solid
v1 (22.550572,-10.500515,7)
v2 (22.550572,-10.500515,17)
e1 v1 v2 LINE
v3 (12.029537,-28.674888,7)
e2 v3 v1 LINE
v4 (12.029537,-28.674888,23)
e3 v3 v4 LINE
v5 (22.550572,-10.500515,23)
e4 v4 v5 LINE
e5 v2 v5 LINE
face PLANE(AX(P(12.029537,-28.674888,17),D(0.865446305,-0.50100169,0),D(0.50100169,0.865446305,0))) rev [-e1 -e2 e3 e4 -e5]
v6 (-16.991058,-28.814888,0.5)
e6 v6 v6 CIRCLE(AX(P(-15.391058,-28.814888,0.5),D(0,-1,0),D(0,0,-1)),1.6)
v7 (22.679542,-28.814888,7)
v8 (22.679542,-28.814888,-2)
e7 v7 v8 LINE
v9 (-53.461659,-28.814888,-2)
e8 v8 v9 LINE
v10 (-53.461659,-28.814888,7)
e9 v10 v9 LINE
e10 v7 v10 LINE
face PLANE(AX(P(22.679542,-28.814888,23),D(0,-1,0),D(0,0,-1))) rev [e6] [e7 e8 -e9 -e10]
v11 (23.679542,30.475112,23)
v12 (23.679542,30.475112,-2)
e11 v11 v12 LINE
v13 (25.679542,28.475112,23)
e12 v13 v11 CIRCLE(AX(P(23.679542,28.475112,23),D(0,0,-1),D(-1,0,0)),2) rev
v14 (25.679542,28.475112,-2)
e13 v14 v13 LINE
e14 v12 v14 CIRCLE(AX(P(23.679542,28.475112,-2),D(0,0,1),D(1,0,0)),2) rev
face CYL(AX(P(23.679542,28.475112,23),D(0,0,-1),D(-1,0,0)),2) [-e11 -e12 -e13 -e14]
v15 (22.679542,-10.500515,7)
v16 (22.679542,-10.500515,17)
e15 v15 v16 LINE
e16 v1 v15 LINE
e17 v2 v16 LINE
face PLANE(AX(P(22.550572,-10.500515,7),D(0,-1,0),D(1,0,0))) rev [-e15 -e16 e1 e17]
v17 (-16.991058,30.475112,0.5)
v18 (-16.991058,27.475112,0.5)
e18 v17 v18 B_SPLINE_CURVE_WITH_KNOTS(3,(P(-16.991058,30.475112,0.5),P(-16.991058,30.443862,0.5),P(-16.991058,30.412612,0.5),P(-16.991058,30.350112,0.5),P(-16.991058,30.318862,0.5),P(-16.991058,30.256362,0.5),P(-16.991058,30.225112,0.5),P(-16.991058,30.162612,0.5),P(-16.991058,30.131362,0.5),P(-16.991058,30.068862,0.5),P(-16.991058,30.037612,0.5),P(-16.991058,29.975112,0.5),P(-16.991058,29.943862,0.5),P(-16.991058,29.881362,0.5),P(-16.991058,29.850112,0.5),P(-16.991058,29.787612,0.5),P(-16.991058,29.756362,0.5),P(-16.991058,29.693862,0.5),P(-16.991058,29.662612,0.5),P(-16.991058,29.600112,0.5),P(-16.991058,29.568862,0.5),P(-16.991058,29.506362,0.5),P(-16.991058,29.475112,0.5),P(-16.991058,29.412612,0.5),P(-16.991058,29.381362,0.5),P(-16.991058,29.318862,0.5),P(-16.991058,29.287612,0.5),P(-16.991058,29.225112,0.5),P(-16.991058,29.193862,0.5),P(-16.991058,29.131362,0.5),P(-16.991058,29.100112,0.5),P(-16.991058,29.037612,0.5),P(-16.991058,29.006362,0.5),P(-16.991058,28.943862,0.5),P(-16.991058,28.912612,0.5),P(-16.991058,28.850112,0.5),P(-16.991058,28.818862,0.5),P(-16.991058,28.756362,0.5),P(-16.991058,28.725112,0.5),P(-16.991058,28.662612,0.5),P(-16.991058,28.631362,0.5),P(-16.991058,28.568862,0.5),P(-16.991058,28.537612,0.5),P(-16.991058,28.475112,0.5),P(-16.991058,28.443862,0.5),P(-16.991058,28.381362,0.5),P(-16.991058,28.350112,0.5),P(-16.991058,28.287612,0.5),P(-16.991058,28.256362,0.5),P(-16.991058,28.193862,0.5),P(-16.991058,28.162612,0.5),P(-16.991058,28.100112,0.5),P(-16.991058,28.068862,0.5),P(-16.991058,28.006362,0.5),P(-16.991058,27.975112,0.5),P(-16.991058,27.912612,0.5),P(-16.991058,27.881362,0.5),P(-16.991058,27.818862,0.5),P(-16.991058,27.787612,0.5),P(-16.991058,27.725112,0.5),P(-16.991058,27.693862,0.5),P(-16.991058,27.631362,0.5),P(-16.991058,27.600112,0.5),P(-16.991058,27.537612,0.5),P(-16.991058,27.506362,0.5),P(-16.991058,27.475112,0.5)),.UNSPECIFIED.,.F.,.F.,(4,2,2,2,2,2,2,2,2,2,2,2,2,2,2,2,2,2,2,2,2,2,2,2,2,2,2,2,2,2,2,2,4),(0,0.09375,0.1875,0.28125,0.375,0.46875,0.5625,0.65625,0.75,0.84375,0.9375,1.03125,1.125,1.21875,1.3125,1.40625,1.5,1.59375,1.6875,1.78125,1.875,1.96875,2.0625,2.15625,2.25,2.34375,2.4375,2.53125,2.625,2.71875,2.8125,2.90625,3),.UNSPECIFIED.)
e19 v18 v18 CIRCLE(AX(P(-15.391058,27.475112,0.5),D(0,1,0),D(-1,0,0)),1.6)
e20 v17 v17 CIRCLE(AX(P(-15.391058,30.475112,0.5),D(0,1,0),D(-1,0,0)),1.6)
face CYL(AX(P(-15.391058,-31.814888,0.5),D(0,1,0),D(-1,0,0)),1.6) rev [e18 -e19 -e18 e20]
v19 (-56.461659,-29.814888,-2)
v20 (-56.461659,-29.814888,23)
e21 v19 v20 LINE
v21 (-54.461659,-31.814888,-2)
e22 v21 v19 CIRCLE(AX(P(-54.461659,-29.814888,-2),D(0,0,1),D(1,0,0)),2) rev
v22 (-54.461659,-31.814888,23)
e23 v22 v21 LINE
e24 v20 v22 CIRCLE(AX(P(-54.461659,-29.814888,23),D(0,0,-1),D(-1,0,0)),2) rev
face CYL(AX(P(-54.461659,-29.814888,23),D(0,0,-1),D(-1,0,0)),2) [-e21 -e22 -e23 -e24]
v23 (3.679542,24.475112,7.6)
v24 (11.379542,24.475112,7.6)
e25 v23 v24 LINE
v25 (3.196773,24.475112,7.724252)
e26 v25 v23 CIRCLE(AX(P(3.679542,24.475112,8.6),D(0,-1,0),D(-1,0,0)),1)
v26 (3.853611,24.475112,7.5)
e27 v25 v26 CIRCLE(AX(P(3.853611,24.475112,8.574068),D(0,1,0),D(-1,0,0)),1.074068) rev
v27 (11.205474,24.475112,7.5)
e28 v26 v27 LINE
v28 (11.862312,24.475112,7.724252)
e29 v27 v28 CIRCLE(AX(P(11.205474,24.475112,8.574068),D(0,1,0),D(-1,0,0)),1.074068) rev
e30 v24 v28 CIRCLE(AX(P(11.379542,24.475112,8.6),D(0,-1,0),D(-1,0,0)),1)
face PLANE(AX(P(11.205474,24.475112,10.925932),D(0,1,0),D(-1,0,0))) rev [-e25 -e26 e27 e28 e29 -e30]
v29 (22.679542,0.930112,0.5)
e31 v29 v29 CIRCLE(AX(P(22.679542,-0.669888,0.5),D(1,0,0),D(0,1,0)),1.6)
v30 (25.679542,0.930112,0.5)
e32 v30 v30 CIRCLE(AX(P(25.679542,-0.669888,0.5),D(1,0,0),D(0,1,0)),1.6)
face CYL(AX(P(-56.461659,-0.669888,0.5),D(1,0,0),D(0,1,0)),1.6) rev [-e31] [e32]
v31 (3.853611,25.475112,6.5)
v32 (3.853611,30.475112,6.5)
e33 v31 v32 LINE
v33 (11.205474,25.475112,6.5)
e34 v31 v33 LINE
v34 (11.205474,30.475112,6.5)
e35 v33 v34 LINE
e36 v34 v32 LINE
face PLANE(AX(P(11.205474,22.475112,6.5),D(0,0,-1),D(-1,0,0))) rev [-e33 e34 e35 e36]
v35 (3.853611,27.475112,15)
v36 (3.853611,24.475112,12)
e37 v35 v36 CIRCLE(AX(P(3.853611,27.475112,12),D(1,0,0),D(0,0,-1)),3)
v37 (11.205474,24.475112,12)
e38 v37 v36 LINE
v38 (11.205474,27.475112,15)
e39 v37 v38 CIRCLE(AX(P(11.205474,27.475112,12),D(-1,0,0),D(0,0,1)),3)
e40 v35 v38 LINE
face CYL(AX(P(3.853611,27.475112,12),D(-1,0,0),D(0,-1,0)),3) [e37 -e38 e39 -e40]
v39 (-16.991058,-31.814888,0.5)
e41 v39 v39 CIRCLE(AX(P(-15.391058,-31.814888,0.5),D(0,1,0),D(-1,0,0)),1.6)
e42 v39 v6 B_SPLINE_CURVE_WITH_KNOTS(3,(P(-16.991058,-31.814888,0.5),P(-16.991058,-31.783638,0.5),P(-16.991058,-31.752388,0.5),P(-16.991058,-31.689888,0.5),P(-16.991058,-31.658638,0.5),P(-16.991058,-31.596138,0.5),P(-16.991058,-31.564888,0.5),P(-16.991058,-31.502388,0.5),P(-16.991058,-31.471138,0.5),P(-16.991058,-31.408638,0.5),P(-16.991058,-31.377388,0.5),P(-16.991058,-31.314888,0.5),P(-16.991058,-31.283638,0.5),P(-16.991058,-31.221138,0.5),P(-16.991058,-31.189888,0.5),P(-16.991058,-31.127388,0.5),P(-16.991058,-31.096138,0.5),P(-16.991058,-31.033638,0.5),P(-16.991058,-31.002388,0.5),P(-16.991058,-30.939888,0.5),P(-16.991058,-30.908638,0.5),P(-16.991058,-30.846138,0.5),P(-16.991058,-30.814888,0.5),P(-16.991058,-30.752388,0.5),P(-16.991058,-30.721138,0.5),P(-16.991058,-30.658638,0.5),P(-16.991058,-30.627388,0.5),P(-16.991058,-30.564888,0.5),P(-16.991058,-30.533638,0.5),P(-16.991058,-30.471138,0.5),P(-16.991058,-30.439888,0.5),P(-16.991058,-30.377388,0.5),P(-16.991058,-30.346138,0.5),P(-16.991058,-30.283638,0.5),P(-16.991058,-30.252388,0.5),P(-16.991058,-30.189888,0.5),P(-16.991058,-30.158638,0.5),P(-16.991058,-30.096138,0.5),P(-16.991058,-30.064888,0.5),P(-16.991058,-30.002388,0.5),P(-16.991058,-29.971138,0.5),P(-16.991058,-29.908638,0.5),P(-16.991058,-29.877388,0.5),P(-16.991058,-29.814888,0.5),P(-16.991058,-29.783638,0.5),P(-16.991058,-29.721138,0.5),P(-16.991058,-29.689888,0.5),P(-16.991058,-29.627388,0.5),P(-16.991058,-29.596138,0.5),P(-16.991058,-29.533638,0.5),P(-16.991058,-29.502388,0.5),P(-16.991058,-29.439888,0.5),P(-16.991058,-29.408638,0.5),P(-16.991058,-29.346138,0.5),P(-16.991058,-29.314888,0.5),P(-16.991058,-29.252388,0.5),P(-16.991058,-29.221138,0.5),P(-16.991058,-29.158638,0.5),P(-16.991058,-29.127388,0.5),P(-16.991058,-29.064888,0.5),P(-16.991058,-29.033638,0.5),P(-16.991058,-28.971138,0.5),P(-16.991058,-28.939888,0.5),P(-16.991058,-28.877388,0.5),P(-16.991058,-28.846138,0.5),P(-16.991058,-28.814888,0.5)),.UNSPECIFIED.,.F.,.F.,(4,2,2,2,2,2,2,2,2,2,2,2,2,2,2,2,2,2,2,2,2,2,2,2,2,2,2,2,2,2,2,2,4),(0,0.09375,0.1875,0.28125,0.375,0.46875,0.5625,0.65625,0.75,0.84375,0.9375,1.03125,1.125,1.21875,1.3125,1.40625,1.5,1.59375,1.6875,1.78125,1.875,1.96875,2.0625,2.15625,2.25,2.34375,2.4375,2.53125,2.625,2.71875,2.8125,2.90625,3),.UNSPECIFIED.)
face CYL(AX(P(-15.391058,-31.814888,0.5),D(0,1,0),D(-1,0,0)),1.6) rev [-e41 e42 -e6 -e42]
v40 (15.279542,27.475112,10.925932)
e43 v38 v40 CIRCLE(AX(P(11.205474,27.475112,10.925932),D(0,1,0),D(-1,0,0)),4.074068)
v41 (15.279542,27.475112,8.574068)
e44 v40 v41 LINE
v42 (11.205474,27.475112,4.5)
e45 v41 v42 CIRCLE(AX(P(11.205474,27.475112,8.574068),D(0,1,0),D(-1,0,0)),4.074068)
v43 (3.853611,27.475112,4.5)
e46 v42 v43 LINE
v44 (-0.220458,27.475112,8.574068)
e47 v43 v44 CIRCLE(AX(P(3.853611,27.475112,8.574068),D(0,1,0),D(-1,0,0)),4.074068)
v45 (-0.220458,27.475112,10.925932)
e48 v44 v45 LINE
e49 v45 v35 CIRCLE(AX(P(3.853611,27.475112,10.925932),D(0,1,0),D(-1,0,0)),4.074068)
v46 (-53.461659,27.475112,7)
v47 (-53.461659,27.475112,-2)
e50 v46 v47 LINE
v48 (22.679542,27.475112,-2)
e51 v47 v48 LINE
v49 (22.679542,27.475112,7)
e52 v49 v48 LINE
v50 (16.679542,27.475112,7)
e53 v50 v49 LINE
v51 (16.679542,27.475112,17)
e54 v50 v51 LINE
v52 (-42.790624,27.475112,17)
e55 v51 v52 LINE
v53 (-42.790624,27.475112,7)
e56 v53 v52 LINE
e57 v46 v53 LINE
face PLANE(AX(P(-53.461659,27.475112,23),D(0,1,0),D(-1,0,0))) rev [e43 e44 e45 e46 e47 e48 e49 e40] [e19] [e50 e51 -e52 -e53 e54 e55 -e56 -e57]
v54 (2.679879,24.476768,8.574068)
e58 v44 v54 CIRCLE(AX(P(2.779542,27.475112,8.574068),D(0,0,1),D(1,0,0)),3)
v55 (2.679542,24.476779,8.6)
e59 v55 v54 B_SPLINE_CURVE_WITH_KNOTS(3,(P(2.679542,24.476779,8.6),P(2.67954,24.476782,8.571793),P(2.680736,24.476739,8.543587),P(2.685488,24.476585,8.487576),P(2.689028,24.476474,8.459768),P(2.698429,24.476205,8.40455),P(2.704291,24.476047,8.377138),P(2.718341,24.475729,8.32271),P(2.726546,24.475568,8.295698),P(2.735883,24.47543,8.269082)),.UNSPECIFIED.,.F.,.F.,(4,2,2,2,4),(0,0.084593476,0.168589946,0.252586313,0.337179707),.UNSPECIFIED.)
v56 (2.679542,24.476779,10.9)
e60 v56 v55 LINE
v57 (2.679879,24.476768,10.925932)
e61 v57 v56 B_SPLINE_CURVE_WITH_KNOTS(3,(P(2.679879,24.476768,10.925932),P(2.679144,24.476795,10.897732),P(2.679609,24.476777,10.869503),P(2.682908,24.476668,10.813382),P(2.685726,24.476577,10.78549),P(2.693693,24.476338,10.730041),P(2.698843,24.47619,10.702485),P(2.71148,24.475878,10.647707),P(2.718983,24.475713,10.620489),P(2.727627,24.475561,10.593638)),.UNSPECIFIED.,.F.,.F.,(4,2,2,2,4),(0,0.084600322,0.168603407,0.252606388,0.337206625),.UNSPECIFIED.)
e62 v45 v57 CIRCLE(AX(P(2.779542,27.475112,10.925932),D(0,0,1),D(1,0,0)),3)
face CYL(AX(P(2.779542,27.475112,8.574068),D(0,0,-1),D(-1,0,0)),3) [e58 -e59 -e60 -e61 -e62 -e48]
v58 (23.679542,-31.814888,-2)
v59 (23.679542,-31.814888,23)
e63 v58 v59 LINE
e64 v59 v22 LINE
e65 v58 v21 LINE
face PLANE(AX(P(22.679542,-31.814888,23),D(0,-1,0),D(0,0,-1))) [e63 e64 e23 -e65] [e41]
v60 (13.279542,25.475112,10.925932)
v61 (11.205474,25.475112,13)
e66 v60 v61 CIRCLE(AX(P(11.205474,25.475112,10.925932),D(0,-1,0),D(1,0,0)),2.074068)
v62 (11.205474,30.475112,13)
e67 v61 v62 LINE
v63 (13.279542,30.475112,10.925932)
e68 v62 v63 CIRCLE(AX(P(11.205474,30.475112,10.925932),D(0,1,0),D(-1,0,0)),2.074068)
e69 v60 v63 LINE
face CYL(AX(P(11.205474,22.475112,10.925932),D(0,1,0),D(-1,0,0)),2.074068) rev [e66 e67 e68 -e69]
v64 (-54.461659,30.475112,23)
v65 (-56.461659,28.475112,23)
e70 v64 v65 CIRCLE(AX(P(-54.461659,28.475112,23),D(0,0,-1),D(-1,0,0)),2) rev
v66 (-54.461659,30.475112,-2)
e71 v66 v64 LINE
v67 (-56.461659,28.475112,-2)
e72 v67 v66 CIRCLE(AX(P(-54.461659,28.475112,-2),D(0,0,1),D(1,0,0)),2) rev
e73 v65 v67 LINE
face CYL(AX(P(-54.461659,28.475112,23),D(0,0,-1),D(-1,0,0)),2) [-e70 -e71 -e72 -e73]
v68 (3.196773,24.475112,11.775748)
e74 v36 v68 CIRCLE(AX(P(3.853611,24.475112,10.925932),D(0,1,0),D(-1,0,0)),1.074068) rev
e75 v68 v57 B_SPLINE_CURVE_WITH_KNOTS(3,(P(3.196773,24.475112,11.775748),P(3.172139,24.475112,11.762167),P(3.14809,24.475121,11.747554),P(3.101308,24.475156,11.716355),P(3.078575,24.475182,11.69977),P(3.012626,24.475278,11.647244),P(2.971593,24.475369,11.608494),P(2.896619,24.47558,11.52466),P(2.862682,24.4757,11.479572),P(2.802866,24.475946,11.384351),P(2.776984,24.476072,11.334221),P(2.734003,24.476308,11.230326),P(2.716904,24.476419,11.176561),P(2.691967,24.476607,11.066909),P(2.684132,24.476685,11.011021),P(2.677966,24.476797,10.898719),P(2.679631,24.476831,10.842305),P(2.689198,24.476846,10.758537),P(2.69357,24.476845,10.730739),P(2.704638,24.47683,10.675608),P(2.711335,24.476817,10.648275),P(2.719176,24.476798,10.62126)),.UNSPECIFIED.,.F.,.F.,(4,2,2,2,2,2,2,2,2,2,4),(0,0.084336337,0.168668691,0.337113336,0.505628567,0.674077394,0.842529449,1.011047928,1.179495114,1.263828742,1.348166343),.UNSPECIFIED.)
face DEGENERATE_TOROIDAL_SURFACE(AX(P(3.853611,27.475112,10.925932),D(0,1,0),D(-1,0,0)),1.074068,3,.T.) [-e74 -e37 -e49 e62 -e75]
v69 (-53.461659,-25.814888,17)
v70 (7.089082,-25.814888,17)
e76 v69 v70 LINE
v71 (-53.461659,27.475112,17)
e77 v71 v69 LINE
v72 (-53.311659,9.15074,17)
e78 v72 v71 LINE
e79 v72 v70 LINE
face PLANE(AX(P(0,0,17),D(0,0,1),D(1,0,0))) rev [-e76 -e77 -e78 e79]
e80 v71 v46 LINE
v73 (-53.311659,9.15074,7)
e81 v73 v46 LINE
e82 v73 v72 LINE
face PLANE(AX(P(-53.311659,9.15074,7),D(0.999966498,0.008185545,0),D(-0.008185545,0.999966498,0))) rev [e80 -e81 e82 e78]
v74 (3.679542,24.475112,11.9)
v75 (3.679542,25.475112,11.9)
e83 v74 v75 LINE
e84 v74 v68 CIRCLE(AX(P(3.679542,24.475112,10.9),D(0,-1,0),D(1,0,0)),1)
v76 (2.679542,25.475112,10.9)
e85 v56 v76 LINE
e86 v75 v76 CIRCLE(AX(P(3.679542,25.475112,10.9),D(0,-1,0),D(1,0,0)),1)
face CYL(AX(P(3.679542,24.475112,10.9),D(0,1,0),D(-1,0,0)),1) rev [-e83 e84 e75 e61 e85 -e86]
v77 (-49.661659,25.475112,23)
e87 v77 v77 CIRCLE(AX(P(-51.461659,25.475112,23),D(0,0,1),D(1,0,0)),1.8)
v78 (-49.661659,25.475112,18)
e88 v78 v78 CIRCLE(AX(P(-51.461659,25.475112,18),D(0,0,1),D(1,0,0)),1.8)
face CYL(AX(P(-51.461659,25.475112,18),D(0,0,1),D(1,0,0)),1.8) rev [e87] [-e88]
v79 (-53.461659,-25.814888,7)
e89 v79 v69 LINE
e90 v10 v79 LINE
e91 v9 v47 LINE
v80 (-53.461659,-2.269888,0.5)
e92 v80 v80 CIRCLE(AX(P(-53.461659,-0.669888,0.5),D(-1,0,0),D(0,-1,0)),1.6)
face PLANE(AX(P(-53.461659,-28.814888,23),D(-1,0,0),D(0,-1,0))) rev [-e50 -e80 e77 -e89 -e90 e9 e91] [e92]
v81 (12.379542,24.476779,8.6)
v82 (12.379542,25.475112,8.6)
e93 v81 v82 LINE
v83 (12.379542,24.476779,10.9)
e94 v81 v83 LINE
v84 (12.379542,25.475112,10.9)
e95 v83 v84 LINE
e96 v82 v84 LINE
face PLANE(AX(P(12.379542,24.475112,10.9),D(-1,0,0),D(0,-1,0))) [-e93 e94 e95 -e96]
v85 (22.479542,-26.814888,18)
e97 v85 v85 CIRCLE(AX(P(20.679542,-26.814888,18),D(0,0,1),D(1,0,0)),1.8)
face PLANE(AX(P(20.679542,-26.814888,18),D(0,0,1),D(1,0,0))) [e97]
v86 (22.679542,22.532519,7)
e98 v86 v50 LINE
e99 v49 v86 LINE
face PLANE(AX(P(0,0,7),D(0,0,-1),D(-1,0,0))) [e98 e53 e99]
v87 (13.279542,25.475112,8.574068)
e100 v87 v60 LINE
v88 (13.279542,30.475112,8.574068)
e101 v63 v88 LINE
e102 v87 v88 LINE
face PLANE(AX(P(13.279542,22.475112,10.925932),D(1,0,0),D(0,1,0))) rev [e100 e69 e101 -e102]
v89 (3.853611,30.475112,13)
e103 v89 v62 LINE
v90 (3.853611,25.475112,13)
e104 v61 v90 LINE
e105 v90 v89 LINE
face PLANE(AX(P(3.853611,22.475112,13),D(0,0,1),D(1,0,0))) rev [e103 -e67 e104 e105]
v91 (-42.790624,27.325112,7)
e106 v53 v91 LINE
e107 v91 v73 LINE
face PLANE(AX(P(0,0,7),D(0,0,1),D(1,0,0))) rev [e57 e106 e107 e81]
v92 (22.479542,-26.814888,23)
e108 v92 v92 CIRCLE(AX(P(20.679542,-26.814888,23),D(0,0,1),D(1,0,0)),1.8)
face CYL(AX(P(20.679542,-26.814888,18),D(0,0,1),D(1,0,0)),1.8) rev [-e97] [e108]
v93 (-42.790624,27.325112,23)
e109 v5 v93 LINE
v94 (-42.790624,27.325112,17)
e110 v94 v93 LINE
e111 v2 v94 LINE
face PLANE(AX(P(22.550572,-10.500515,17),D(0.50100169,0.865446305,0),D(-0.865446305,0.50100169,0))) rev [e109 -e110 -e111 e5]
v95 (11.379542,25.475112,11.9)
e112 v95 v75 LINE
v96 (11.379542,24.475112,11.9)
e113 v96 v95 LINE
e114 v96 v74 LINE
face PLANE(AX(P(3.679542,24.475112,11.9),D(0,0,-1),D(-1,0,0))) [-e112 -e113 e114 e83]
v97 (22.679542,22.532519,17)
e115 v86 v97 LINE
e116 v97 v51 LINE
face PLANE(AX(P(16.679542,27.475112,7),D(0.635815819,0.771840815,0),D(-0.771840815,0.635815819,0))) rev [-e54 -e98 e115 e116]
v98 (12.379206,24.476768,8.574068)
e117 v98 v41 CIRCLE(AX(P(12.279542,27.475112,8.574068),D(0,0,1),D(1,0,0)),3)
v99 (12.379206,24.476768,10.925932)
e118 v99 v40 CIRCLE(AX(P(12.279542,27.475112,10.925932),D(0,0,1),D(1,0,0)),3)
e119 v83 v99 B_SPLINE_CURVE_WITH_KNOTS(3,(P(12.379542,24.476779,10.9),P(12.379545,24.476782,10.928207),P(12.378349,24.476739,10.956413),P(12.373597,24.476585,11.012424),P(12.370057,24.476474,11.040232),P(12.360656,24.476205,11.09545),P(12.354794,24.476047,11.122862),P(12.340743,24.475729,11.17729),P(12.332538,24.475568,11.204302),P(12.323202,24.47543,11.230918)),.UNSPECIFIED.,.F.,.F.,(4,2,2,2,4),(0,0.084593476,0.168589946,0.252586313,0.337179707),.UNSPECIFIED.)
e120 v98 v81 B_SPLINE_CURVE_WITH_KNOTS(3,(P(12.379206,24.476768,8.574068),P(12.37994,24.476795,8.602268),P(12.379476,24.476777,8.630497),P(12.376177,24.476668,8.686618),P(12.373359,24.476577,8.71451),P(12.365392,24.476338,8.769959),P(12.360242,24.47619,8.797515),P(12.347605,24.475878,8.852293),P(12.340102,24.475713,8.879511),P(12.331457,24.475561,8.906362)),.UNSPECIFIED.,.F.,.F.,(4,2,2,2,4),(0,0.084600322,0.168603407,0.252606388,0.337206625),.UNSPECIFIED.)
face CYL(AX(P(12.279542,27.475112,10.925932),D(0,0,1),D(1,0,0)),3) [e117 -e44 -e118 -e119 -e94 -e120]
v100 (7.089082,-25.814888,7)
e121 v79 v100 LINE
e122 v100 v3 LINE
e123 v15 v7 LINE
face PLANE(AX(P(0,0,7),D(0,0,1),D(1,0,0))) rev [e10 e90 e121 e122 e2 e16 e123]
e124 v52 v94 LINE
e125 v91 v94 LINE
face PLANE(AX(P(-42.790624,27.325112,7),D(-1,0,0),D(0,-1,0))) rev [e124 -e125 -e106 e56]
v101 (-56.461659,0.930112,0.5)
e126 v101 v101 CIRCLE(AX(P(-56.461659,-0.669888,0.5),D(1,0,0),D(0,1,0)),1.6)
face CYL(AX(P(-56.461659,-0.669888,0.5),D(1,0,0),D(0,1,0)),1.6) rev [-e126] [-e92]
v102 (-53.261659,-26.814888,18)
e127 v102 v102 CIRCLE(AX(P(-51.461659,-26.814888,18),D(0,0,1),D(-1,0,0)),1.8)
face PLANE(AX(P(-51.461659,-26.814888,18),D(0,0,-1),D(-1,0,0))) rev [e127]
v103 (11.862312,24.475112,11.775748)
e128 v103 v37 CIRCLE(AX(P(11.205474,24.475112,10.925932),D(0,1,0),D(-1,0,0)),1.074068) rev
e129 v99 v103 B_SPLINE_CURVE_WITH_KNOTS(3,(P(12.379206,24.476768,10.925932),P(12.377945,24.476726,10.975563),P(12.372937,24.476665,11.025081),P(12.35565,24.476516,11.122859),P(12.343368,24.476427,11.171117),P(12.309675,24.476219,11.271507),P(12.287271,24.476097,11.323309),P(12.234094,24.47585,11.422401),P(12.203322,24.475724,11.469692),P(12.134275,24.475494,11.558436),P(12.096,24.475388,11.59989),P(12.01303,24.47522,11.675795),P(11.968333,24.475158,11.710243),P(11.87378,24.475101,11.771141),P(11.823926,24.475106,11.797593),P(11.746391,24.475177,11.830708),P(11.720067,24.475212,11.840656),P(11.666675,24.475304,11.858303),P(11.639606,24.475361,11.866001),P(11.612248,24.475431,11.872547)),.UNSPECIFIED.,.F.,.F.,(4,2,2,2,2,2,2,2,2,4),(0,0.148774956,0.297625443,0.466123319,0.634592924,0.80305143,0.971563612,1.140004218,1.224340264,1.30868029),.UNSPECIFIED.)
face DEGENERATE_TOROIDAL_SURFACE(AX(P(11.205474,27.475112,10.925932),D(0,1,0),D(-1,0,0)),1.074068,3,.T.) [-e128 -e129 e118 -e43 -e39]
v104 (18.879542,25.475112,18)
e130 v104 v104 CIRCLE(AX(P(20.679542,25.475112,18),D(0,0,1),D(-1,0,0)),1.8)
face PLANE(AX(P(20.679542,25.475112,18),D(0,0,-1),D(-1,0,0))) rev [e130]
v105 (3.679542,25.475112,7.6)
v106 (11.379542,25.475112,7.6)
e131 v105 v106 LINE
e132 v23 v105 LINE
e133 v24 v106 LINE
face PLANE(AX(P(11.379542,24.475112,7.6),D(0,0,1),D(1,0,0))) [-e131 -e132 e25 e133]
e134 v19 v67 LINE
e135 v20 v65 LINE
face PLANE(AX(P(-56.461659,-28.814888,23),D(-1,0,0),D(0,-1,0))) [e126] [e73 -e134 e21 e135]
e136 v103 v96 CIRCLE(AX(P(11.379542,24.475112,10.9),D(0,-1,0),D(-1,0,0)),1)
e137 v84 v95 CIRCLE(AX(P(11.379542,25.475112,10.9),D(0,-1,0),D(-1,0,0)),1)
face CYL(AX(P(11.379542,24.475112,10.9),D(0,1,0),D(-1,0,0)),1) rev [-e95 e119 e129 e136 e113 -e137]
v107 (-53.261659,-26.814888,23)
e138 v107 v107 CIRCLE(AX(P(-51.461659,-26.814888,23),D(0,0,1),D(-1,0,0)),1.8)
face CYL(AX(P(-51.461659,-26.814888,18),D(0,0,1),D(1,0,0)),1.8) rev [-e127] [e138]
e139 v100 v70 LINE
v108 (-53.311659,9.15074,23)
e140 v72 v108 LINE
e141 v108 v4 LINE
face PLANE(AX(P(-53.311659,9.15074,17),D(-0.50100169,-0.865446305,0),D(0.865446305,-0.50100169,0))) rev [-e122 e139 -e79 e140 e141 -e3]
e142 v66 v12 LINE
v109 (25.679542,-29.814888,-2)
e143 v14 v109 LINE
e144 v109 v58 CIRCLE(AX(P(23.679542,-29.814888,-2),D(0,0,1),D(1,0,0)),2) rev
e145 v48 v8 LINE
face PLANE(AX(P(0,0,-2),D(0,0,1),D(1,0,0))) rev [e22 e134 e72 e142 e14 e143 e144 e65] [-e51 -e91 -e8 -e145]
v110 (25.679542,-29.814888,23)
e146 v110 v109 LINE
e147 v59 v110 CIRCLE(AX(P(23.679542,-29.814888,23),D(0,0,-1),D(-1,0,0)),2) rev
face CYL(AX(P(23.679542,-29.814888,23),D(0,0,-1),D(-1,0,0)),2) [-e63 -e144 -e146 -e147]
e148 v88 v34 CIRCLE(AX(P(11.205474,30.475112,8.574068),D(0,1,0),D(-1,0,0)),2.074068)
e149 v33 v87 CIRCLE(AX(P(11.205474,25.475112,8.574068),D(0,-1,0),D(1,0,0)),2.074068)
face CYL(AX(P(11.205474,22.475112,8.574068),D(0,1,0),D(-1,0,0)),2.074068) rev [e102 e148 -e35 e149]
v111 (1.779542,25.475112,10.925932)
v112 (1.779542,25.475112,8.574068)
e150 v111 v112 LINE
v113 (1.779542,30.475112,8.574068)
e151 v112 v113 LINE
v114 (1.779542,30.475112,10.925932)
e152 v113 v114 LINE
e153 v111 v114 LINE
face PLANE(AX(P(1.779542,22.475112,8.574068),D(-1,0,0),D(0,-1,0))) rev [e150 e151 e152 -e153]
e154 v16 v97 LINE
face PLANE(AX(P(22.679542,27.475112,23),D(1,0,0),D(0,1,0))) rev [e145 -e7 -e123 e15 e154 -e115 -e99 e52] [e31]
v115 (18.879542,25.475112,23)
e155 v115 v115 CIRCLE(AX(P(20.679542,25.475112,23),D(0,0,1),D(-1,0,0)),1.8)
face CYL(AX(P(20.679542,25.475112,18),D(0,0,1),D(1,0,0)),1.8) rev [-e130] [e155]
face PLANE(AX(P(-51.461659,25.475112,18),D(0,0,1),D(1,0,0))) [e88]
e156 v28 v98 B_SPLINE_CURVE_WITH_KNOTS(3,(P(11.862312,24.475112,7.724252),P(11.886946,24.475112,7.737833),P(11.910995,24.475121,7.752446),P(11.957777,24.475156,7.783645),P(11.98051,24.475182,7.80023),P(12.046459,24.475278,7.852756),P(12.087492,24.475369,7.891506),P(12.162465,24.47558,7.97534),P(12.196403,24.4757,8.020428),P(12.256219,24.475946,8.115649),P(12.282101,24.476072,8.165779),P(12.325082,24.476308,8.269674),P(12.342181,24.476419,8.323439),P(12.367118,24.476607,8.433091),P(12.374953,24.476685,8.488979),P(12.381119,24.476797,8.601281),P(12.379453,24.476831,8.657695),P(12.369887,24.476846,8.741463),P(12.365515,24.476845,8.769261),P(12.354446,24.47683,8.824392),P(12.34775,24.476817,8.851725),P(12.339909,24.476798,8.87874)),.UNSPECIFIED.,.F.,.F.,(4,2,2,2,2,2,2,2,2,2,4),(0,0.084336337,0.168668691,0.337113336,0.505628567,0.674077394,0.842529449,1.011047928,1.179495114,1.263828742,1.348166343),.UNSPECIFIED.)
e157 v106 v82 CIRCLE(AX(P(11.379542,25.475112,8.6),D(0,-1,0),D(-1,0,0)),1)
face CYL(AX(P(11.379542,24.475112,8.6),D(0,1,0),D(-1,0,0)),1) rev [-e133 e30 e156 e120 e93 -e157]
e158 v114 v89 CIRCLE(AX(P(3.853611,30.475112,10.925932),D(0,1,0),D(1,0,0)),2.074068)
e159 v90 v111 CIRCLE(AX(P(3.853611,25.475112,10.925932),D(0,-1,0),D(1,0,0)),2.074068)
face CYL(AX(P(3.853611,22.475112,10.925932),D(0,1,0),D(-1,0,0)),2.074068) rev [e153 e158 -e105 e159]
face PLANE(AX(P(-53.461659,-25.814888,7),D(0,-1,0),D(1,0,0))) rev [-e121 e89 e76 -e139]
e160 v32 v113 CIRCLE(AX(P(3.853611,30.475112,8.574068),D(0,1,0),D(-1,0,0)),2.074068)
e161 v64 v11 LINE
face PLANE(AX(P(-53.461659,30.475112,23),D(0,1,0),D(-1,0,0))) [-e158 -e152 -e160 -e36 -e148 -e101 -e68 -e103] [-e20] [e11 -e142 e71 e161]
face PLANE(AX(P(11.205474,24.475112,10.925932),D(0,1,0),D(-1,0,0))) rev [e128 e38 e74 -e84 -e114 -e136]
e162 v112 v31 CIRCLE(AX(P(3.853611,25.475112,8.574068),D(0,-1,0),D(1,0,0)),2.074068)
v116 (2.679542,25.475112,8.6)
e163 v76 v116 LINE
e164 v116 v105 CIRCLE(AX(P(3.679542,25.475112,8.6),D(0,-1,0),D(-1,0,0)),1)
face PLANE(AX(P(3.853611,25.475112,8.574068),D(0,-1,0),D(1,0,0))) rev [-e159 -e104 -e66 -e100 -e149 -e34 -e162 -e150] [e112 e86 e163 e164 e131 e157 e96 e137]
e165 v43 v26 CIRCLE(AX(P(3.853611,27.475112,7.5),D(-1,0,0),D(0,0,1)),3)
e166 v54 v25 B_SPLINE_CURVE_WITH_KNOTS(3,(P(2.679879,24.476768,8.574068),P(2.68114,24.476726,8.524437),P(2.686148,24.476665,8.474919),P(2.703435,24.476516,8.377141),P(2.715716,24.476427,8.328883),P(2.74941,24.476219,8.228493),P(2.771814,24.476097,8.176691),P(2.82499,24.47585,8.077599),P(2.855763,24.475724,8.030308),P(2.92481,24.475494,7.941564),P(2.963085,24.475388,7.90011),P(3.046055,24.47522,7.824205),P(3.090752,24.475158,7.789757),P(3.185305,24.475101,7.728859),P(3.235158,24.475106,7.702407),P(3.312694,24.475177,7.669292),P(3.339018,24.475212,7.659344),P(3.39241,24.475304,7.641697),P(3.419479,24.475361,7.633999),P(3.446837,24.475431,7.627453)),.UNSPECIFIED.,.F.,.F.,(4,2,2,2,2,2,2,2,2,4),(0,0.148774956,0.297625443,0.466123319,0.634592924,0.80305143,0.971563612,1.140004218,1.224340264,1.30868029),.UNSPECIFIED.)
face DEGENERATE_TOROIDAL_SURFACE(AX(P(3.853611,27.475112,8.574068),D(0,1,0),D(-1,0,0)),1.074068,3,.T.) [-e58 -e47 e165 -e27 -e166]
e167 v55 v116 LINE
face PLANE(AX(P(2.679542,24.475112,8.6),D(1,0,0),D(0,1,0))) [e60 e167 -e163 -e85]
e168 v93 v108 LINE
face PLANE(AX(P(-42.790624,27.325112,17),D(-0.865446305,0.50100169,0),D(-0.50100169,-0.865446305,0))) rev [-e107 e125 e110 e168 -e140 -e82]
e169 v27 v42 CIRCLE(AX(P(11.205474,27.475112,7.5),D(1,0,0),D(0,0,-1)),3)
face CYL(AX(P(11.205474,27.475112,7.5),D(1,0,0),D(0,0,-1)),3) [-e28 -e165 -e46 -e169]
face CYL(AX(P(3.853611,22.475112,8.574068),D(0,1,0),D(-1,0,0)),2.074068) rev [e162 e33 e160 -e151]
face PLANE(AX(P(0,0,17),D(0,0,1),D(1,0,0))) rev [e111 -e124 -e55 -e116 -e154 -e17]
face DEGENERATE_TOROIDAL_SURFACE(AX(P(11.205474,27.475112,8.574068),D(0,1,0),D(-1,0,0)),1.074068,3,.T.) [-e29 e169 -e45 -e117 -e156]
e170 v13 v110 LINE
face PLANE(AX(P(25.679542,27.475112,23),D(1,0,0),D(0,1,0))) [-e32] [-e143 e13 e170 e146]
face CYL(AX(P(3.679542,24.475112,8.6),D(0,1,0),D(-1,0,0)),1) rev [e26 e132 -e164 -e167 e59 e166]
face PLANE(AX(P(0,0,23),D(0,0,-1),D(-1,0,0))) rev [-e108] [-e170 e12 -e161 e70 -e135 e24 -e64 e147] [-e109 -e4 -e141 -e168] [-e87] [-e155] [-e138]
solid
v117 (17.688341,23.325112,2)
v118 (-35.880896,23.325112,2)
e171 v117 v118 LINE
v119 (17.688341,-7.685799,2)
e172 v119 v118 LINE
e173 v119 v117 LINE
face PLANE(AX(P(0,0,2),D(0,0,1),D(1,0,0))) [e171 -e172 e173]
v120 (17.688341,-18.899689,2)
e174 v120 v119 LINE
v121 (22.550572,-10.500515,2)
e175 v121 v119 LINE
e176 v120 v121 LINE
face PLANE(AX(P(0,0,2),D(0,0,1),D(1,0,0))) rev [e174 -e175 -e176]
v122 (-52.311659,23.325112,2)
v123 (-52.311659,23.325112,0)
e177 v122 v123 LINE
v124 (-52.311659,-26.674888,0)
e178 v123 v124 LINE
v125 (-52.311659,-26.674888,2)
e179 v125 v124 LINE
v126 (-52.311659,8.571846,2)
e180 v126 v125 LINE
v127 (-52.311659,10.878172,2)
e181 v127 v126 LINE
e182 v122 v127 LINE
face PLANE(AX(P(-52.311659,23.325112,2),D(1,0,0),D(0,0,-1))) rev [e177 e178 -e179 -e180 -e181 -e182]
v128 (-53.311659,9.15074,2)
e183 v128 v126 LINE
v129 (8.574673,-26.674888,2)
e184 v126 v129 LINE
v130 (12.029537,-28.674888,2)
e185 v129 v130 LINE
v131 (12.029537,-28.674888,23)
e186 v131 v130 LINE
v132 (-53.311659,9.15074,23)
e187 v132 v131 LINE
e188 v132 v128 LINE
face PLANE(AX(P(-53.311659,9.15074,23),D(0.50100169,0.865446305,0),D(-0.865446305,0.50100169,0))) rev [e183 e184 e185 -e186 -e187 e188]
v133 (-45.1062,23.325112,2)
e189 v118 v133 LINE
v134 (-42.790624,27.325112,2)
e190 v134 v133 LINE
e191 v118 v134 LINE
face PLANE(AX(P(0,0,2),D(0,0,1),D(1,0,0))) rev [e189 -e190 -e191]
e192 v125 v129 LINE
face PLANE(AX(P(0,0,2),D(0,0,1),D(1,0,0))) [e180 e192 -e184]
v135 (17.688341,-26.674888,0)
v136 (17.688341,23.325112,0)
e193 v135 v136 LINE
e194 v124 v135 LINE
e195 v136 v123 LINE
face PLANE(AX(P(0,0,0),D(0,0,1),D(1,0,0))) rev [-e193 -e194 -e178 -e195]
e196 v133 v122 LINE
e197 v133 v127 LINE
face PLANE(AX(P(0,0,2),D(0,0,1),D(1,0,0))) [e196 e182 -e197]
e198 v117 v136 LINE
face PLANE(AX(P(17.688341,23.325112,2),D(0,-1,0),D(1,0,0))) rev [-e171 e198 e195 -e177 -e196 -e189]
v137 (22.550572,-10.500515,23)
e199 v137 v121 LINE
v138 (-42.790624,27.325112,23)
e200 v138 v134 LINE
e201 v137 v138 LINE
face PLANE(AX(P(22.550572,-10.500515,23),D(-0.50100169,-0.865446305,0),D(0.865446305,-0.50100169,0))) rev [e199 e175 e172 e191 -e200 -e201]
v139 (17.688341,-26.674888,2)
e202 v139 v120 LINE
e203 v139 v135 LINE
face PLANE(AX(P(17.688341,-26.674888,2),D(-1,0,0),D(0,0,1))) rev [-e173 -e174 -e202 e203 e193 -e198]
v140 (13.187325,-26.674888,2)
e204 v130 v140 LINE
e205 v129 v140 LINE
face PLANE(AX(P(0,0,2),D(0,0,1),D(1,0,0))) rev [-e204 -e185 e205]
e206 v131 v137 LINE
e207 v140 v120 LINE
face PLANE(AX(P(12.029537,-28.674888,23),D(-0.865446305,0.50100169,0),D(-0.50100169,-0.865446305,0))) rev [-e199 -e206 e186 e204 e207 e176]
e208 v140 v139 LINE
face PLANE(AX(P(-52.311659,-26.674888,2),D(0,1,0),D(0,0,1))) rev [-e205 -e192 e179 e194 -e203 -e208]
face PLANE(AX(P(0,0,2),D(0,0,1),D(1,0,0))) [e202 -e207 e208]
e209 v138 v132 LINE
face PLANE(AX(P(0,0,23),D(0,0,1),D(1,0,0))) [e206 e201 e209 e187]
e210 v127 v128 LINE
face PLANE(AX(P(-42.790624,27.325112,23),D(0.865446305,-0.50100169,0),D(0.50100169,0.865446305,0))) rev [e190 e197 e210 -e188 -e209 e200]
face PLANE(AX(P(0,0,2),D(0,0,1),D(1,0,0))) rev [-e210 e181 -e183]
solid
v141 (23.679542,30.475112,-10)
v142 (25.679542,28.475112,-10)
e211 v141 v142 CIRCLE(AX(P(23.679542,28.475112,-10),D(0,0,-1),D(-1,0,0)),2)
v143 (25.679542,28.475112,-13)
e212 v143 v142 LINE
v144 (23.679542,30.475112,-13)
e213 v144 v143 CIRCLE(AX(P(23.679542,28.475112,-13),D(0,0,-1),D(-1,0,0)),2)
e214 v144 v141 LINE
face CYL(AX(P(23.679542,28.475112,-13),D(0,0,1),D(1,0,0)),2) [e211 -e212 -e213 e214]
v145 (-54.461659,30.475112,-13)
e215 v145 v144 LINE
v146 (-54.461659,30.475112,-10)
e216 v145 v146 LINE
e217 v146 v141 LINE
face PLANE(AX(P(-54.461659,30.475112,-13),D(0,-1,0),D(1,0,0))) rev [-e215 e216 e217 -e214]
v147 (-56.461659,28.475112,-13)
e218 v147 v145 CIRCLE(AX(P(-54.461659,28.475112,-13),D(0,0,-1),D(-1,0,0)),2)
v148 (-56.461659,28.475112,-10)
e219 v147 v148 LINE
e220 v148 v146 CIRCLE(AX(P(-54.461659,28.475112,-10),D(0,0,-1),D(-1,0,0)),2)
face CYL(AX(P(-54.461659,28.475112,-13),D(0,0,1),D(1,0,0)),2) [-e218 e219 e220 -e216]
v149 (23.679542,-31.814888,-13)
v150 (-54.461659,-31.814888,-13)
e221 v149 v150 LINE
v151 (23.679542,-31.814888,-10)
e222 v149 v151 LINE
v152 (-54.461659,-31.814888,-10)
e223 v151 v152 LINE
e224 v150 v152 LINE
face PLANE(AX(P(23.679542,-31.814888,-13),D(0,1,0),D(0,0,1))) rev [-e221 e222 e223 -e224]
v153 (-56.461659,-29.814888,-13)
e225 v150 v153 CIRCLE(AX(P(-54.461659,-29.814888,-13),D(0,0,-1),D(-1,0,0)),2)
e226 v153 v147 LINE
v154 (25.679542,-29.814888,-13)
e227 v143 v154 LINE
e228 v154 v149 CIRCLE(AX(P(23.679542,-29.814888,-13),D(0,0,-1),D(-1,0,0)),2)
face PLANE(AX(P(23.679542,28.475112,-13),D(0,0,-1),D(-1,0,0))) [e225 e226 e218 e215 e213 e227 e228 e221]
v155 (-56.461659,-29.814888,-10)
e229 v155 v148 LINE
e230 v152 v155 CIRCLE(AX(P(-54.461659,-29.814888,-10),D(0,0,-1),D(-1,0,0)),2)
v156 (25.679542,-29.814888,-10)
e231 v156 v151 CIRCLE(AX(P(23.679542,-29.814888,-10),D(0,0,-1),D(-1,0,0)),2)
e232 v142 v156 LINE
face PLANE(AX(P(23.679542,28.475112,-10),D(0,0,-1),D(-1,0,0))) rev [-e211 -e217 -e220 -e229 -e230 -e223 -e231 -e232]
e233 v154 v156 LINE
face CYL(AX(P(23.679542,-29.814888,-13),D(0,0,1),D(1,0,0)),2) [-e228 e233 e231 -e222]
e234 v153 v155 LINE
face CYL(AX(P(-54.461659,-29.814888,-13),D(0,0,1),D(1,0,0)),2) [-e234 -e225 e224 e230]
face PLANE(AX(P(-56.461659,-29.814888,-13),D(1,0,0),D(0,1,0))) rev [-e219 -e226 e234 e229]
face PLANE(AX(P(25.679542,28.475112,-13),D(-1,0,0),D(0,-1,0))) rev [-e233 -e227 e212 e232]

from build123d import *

# Parameters (mm, degrees)
SKETCH1_W                = 70
SKETCH1_H                = 50
BOSS_EXTRUDE1_DEPTH      = 2
BOSS_EXTRUDE2_DEPTH      = 21
EXTRUDE_THIN1_DEPTH      = 10
EXTRUDE_THIN1_DEPTH_BACK = 23
SKETCH3_W                = 82.141201594
SKETCH3_H                = 62.29
SKETCH3_W_2              = 76.141201594
SKETCH3_H_2              = 56.29
SKETCH4_W                = 76.141201594
SKETCH4_H                = 56.29
BOSS_EXTRUDE3_DEPTH      = 6
FILLET1_R                = 2
BOSS_EXTRUDE4_DEPTH      = 3
BOSS_EXTRUDE8_DEPTH      = 10
CUT_EXTRUDE1_DEPTH       = 8
CUT_EXTRUDE2_DEPTH       = 8
EXTRUDE_THIN2_DEPTH      = 6
BOSS_EXTRUDE9_START      = 2
BOSS_EXTRUDE9_DEPTH      = 1
FILLET2_R                = 3
SKETCH11_R               = 1.8
CUT_EXTRUDE3_DEPTH       = 5
CUT_EXTRUDE4_DEPTH       = 88.160559078
CUT_EXTRUDE4_DEPTH_BACK  = 88.160559078
SKETCH12_R               = 1.6
CUT_EXTRUDE5_DEPTH       = 92.040453046
CUT_EXTRUDE5_DEPTH_BACK  = 92.040453046
SKETCH13_R               = 1.6


with BuildPart() as part:
    # Sketch1 → Boss-Extrude1 (new body)
    with BuildSketch(Plane.XY):
        with Locations((-17.311659193, -1.674887892)):
            Rectangle(SKETCH1_W, SKETCH1_H)
    extrude(amount=BOSS_EXTRUDE1_DEPTH)

    # Sketch2 → Boss-Extrude2 (add)
    with BuildSketch(Plane.XY.offset(2)):
        Polygon((-42.790623702, 27.325112108), (-53.311659193, 9.150739706), (12.029536823, -28.674887892), (22.550572314, -10.500515491), align=None)
    extrude(amount=BOSS_EXTRUDE2_DEPTH)


with BuildPart() as body_2:
    # Sketch3 → Extrude-Thin1 (new, two sides: drawn at the far end of the back side and taken through both)
    with BuildSketch(Plane(origin=(0, 0, 0), x_dir=(-1, 0, 0), z_dir=(0, 0, -1)).offset(-EXTRUDE_THIN1_DEPTH_BACK)):
        with Locations((15.391058396, -0.669887892)):
            Rectangle(SKETCH3_W, SKETCH3_H)
        with Locations((15.391058396, -0.669887892)):
            Rectangle(SKETCH3_W_2, SKETCH3_H_2, mode=Mode.SUBTRACT)
    extrude(amount=EXTRUDE_THIN1_DEPTH + EXTRUDE_THIN1_DEPTH_BACK)

    # Sketch4 → Boss-Extrude3 (add)
    with BuildSketch(Plane.XY.offset(23)):
        with Locations((-15.391058396, -0.669887892)):
            Rectangle(SKETCH4_W, SKETCH4_H)
        Polygon((-42.790623702, 27.325112108), (-53.311659193, 9.150739706), (12.029536823, -28.674887892), (22.550572314, -10.500515491), align=None, mode=Mode.SUBTRACT)
    extrude(amount=-BOSS_EXTRUDE3_DEPTH)

    # Fillet1
    fillet1_edges = [body_2.edges().sort_by_distance(p)[0] for p in [
        (-56.461659193, 30.475112108, 6.5),
        (-56.461659193, -31.814887892, 6.5),
        (25.679542401, -31.814887892, 6.5),
        (25.679542401, 30.475112108, 6.5),
    ]]
    fillet(fillet1_edges, radius=FILLET1_R)

    # Sketch6 → Boss-Extrude8 (add)
    with BuildSketch(Plane(origin=(0, 0, 17), x_dir=(-1, 0, 0), z_dir=(0, 0, -1))):
        Polygon((-16.679542401, 27.475112108), (-22.679542401, 22.532519231), (-22.679542401, 27.475112108), align=None)
        Polygon((42.790623702, 27.325112108), (53.311659193, 9.150739706), (53.461659193, 27.475112108), (42.790623702, 27.475112108), align=None)
        Polygon((-12.029536823, -28.674887892), (-22.550572314, -10.500515491), (-22.679542401, -10.500515491), (-22.679542401, -28.814887892), (53.461659193, -28.814887892), (53.461659193, -25.814887892), (-7.089081569, -25.814887892), align=None)
    extrude(amount=BOSS_EXTRUDE8_DEPTH)

    # Sketch7 → Cut-Extrude1 (cut)
    with BuildSketch(Plane(origin=(0, 0, -10), x_dir=(-1, 0, 0), z_dir=(0, 0, -1))):
        Polygon((-28.614884021, 33.287753378), (-28.614884021, -37.390774311), (75.821884566, -37.390774311), (71.624058107, 45.166479381), align=None)
    extrude(amount=-CUT_EXTRUDE1_DEPTH, mode=Mode.SUBTRACT)

    # Sketch8 → Cut-Extrude2 (cut)
    with BuildSketch(Plane(origin=(0, 30.475112108, 0), x_dir=(1, 0, 0), z_dir=(0, 1, 0))):
        with BuildLine():
            Line((1.779542401, -8.574068331), (1.779542401, -10.925931669))
            ThreePointArc((1.779542401, -10.925931669), (2.38702295, -12.392519451), (3.853610732, -13))
            Line((3.853610732, -13), (11.20547407, -13))
            ThreePointArc((11.20547407, -13), (12.672061852, -12.392519451), (13.279542401, -10.925931669))
            Line((13.279542401, -10.925931669), (13.279542401, -8.574068331))
            ThreePointArc((13.279542401, -8.574068331), (12.672061852, -7.107480549), (11.20547407, -6.5))
            Line((11.20547407, -6.5), (3.853610732, -6.5))
            ThreePointArc((3.853610732, -6.5), (2.38702295, -7.107480549), (1.779542401, -8.574068331))
        make_face()
    extrude(amount=-CUT_EXTRUDE2_DEPTH, mode=Mode.SUBTRACT)

    # Sketch8<2> → Extrude-Thin2 (add)
    with BuildSketch(Plane(origin=(0, 30.475112108, 0), x_dir=(1, 0, 0), z_dir=(0, 1, 0))):
        with BuildLine():
            Line((-0.220457599, -8.574068331), (-0.220457599, -10.925931669))
            ThreePointArc((-0.220457599, -10.925931669), (0.972809388, -13.806733013), (3.853610732, -15))
            Line((3.853610732, -15), (11.20547407, -15))
            ThreePointArc((11.20547407, -15), (14.086275414, -13.806733013), (15.279542401, -10.925931669))
            Line((15.279542401, -10.925931669), (15.279542401, -8.574068331))
            ThreePointArc((15.279542401, -8.574068331), (14.086275414, -5.693266987), (11.20547407, -4.5))
            Line((11.20547407, -4.5), (3.853610732, -4.5))
            ThreePointArc((3.853610732, -4.5), (0.972809388, -5.693266987), (-0.220457599, -8.574068331))
        make_face()
        with BuildLine():
            Line((1.779542401, -8.574068331), (1.779542401, -10.925931669))
            ThreePointArc((1.779542401, -10.925931669), (2.38702295, -12.392519451), (3.853610732, -13))
            Line((3.853610732, -13), (11.20547407, -13))
            ThreePointArc((11.20547407, -13), (12.672061852, -12.392519451), (13.279542401, -10.925931669))
            Line((13.279542401, -10.925931669), (13.279542401, -8.574068331))
            ThreePointArc((13.279542401, -8.574068331), (12.672061852, -7.107480549), (11.20547407, -6.5))
            Line((11.20547407, -6.5), (3.853610732, -6.5))
            ThreePointArc((3.853610732, -6.5), (2.38702295, -7.107480549), (1.779542401, -8.574068331))
        make_face(mode=Mode.SUBTRACT)
    extrude(amount=-EXTRUDE_THIN2_DEPTH)

    # Sketch10 → Boss-Extrude9 (add)
    with BuildSketch(Plane.XZ.offset(-27.475112108).offset(BOSS_EXTRUDE9_START)):
        with BuildLine():
            Line((1.779542401, 8.574068331), (1.779542401, 10.925931669))
            ThreePointArc((1.779542401, 10.925931669), (2.38702295, 12.392519451), (3.853610732, 13))
            Line((3.853610732, 13), (11.20547407, 13))
            ThreePointArc((11.20547407, 13), (12.672061852, 12.392519451), (13.279542401, 10.925931669))
            Line((13.279542401, 10.925931669), (13.279542401, 8.574068331))
            ThreePointArc((13.279542401, 8.574068331), (12.672061852, 7.107480549), (11.20547407, 6.5))
            Line((11.20547407, 6.5), (3.853610732, 6.5))
            ThreePointArc((3.853610732, 6.5), (2.38702295, 7.107480549), (1.779542401, 8.574068331))
        make_face()
        with BuildLine():
            Line((3.679542401, 11.9), (11.379542401, 11.9))
            ThreePointArc((11.379542401, 11.9), (12.086649182, 11.607106781), (12.379542401, 10.9))
            Line((12.379542401, 10.9), (12.379542401, 8.6))
            ThreePointArc((12.379542401, 8.6), (12.086649182, 7.892893219), (11.379542401, 7.6))
            Line((11.379542401, 7.6), (3.679542401, 7.6))
            ThreePointArc((3.679542401, 7.6), (2.97243562, 7.892893219), (2.679542401, 8.6))
            Line((2.679542401, 8.6), (2.679542401, 10.9))
            ThreePointArc((2.679542401, 10.9), (2.97243562, 11.607106781), (3.679542401, 11.9))
        make_face(mode=Mode.SUBTRACT)
    extrude(amount=BOSS_EXTRUDE9_DEPTH)

    # Fillet2
    # the kernel refuses this fillet: 3 mm, written as the material it takes off along each edge
    with BuildSketch(Plane(origin=(3.853610732, 24.475112108, 15), x_dir=(0, 1, 0), z_dir=(1, 0, 0)), Plane(origin=(11.20547407, 24.475112108, 4.5), x_dir=(0, 1, 0), z_dir=(-1, 0, 0))) as fillet2_piece_1:
        with BuildLine():
            CenterArc((FILLET2_R, -FILLET2_R), FILLET2_R, 90, 90)
            Line((0, -FILLET2_R), (0, 0))
            Line((0, 0), (FILLET2_R, 0))
        make_face()
    extrude(amount=7.351863339, mode=Mode.SUBTRACT)
    with BuildSketch(Plane(origin=(11.20547407, 24.475112108, 10.925931669), x_dir=(0, 0, 1), z_dir=(-1, 0, 0))) as fillet2_piece_2:
        with BuildLine():
            CenterArc((4.074068331 - FILLET2_R, FILLET2_R), FILLET2_R, 270, 90)
            Line((4.074068331 - FILLET2_R, 0), (4.074068331, 0))
            Line((4.074068331, 0), (4.074068331, FILLET2_R))
        make_face()
    revolve(axis=Axis((11.20547407, 24.475112108, 10.925931669), (0, 1, 0)), revolution_arc=90, mode=Mode.SUBTRACT)
    with BuildSketch(Plane(origin=(11.20547407, 24.475112108, 8.574068331), x_dir=(1, 0, 0), z_dir=(0, 0, 1))) as fillet2_piece_3:
        with BuildLine():
            CenterArc((4.074068331 - FILLET2_R, FILLET2_R), FILLET2_R, 270, 90)
            Line((4.074068331 - FILLET2_R, 0), (4.074068331, 0))
            Line((4.074068331, 0), (4.074068331, FILLET2_R))
        make_face()
    revolve(axis=Axis((11.20547407, 24.475112108, 8.574068331), (0, 1, 0)), revolution_arc=90, mode=Mode.SUBTRACT)
    with BuildSketch(Plane(origin=(3.853610732, 24.475112108, 8.574068331), x_dir=(0, 0, -1), z_dir=(1, 0, 0))) as fillet2_piece_4:
        with BuildLine():
            CenterArc((4.074068331 - FILLET2_R, FILLET2_R), FILLET2_R, 270, 90)
            Line((4.074068331 - FILLET2_R, 0), (4.074068331, 0))
            Line((4.074068331, 0), (4.074068331, FILLET2_R))
        make_face()
    revolve(axis=Axis((3.853610732, 24.475112108, 8.574068331), (0, 1, 0)), revolution_arc=90, mode=Mode.SUBTRACT)
    with BuildSketch(Plane(origin=(3.853610732, 24.475112108, 10.925931669), x_dir=(-1, 0, 0), z_dir=(0, 0, -1))) as fillet2_piece_5:
        with BuildLine():
            CenterArc((4.074068331 - FILLET2_R, FILLET2_R), FILLET2_R, 270, 90)
            Line((4.074068331 - FILLET2_R, 0), (4.074068331, 0))
            Line((4.074068331, 0), (4.074068331, FILLET2_R))
        make_face()
    revolve(axis=Axis((3.853610732, 24.475112108, 10.925931669), (0, 1, 0)), revolution_arc=90, mode=Mode.SUBTRACT)
    with BuildSketch(Plane(origin=(-0.220457599, 24.475112108, 8.574068331), x_dir=(0, 1, 0), z_dir=(0, 0, 1)), Plane(origin=(15.279542401, 24.475112108, 10.925931669), x_dir=(0, 1, 0), z_dir=(0, 0, -1))) as fillet2_piece_6:
        with BuildLine():
            CenterArc((FILLET2_R, -FILLET2_R), FILLET2_R, 90, 90)
            Line((0, -FILLET2_R), (0, 0))
            Line((0, 0), (FILLET2_R, 0))
        make_face()
    extrude(amount=2.351863339, mode=Mode.SUBTRACT)

    # Sketch11 → Cut-Extrude3 (cut)
    with BuildSketch(Plane.XY.offset(23)):
        with Locations((-51.461659193, 25.475112108)):
            Circle(SKETCH11_R)
        with Locations(Location((-51.461659193, -26.814887892, 0), (0, 0, 180))):
            Circle(SKETCH11_R)
        with Locations((20.679542401, -26.814887892)):
            Circle(SKETCH11_R)
        with Locations(Location((20.679542401, 25.475112108, 0), (0, 0, 180))):
            Circle(SKETCH11_R)
    extrude(amount=-CUT_EXTRUDE3_DEPTH, mode=Mode.SUBTRACT)

    # Sketch12 → Cut-Extrude4 (cut, two sides: drawn at the far end of the back side and taken through both)
    with BuildSketch(Plane(origin=(0, 30.475112108, 0), x_dir=(1, 0, 0), z_dir=(0, 1, 0)).offset(-CUT_EXTRUDE4_DEPTH_BACK)):
        with Locations(Location((-15.391058396, -0.5, 0), (0, 0, 180))):
            Circle(SKETCH12_R)
    extrude(amount=CUT_EXTRUDE4_DEPTH + CUT_EXTRUDE4_DEPTH_BACK, mode=Mode.SUBTRACT)

    # Sketch13 → Cut-Extrude5 (cut, two sides: drawn at the far end of the back side and taken through both)
    with BuildSketch(Plane(origin=(25.679542401, 0, 0), x_dir=(0, 0, -1), z_dir=(1, 0, 0)).offset(-CUT_EXTRUDE5_DEPTH_BACK)):
        with Locations(Location((-0.5, -0.669887892, 0), (0, 0, 90))):
            Circle(SKETCH13_R)
    extrude(amount=CUT_EXTRUDE5_DEPTH + CUT_EXTRUDE5_DEPTH_BACK, mode=Mode.SUBTRACT)


with BuildPart() as body_3:
    # Sketch5 → Boss-Extrude4 (new body)
    with BuildSketch(Plane(origin=(0, 0, -10), x_dir=(-1, 0, 0), z_dir=(0, 0, -1))):
        with BuildLine():
            Line((-25.679542401, 28.475112108), (-25.679542401, -29.814887892))
            ThreePointArc((-25.679542401, -29.814887892), (-25.093755963, -31.229101455), (-23.679542401, -31.814887892))
            Line((-23.679542401, -31.814887892), (54.461659193, -31.814887892))
            ThreePointArc((54.461659193, -31.814887892), (55.875872755, -31.229101455), (56.461659193, -29.814887892))
            Line((56.461659193, -29.814887892), (56.461659193, 28.475112108))
            ThreePointArc((56.461659193, 28.475112108), (55.875872755, 29.88932567), (54.461659193, 30.475112108))
            Line((54.461659193, 30.475112108), (-23.679542401, 30.475112108))
            ThreePointArc((-23.679542401, 30.475112108), (-25.093755963, 29.88932567), (-25.679542401, 28.475112108))
        make_face()
    extrude(amount=BOSS_EXTRUDE4_DEPTH)


solid = Compound([part.part, body_2.part, body_3.part])
